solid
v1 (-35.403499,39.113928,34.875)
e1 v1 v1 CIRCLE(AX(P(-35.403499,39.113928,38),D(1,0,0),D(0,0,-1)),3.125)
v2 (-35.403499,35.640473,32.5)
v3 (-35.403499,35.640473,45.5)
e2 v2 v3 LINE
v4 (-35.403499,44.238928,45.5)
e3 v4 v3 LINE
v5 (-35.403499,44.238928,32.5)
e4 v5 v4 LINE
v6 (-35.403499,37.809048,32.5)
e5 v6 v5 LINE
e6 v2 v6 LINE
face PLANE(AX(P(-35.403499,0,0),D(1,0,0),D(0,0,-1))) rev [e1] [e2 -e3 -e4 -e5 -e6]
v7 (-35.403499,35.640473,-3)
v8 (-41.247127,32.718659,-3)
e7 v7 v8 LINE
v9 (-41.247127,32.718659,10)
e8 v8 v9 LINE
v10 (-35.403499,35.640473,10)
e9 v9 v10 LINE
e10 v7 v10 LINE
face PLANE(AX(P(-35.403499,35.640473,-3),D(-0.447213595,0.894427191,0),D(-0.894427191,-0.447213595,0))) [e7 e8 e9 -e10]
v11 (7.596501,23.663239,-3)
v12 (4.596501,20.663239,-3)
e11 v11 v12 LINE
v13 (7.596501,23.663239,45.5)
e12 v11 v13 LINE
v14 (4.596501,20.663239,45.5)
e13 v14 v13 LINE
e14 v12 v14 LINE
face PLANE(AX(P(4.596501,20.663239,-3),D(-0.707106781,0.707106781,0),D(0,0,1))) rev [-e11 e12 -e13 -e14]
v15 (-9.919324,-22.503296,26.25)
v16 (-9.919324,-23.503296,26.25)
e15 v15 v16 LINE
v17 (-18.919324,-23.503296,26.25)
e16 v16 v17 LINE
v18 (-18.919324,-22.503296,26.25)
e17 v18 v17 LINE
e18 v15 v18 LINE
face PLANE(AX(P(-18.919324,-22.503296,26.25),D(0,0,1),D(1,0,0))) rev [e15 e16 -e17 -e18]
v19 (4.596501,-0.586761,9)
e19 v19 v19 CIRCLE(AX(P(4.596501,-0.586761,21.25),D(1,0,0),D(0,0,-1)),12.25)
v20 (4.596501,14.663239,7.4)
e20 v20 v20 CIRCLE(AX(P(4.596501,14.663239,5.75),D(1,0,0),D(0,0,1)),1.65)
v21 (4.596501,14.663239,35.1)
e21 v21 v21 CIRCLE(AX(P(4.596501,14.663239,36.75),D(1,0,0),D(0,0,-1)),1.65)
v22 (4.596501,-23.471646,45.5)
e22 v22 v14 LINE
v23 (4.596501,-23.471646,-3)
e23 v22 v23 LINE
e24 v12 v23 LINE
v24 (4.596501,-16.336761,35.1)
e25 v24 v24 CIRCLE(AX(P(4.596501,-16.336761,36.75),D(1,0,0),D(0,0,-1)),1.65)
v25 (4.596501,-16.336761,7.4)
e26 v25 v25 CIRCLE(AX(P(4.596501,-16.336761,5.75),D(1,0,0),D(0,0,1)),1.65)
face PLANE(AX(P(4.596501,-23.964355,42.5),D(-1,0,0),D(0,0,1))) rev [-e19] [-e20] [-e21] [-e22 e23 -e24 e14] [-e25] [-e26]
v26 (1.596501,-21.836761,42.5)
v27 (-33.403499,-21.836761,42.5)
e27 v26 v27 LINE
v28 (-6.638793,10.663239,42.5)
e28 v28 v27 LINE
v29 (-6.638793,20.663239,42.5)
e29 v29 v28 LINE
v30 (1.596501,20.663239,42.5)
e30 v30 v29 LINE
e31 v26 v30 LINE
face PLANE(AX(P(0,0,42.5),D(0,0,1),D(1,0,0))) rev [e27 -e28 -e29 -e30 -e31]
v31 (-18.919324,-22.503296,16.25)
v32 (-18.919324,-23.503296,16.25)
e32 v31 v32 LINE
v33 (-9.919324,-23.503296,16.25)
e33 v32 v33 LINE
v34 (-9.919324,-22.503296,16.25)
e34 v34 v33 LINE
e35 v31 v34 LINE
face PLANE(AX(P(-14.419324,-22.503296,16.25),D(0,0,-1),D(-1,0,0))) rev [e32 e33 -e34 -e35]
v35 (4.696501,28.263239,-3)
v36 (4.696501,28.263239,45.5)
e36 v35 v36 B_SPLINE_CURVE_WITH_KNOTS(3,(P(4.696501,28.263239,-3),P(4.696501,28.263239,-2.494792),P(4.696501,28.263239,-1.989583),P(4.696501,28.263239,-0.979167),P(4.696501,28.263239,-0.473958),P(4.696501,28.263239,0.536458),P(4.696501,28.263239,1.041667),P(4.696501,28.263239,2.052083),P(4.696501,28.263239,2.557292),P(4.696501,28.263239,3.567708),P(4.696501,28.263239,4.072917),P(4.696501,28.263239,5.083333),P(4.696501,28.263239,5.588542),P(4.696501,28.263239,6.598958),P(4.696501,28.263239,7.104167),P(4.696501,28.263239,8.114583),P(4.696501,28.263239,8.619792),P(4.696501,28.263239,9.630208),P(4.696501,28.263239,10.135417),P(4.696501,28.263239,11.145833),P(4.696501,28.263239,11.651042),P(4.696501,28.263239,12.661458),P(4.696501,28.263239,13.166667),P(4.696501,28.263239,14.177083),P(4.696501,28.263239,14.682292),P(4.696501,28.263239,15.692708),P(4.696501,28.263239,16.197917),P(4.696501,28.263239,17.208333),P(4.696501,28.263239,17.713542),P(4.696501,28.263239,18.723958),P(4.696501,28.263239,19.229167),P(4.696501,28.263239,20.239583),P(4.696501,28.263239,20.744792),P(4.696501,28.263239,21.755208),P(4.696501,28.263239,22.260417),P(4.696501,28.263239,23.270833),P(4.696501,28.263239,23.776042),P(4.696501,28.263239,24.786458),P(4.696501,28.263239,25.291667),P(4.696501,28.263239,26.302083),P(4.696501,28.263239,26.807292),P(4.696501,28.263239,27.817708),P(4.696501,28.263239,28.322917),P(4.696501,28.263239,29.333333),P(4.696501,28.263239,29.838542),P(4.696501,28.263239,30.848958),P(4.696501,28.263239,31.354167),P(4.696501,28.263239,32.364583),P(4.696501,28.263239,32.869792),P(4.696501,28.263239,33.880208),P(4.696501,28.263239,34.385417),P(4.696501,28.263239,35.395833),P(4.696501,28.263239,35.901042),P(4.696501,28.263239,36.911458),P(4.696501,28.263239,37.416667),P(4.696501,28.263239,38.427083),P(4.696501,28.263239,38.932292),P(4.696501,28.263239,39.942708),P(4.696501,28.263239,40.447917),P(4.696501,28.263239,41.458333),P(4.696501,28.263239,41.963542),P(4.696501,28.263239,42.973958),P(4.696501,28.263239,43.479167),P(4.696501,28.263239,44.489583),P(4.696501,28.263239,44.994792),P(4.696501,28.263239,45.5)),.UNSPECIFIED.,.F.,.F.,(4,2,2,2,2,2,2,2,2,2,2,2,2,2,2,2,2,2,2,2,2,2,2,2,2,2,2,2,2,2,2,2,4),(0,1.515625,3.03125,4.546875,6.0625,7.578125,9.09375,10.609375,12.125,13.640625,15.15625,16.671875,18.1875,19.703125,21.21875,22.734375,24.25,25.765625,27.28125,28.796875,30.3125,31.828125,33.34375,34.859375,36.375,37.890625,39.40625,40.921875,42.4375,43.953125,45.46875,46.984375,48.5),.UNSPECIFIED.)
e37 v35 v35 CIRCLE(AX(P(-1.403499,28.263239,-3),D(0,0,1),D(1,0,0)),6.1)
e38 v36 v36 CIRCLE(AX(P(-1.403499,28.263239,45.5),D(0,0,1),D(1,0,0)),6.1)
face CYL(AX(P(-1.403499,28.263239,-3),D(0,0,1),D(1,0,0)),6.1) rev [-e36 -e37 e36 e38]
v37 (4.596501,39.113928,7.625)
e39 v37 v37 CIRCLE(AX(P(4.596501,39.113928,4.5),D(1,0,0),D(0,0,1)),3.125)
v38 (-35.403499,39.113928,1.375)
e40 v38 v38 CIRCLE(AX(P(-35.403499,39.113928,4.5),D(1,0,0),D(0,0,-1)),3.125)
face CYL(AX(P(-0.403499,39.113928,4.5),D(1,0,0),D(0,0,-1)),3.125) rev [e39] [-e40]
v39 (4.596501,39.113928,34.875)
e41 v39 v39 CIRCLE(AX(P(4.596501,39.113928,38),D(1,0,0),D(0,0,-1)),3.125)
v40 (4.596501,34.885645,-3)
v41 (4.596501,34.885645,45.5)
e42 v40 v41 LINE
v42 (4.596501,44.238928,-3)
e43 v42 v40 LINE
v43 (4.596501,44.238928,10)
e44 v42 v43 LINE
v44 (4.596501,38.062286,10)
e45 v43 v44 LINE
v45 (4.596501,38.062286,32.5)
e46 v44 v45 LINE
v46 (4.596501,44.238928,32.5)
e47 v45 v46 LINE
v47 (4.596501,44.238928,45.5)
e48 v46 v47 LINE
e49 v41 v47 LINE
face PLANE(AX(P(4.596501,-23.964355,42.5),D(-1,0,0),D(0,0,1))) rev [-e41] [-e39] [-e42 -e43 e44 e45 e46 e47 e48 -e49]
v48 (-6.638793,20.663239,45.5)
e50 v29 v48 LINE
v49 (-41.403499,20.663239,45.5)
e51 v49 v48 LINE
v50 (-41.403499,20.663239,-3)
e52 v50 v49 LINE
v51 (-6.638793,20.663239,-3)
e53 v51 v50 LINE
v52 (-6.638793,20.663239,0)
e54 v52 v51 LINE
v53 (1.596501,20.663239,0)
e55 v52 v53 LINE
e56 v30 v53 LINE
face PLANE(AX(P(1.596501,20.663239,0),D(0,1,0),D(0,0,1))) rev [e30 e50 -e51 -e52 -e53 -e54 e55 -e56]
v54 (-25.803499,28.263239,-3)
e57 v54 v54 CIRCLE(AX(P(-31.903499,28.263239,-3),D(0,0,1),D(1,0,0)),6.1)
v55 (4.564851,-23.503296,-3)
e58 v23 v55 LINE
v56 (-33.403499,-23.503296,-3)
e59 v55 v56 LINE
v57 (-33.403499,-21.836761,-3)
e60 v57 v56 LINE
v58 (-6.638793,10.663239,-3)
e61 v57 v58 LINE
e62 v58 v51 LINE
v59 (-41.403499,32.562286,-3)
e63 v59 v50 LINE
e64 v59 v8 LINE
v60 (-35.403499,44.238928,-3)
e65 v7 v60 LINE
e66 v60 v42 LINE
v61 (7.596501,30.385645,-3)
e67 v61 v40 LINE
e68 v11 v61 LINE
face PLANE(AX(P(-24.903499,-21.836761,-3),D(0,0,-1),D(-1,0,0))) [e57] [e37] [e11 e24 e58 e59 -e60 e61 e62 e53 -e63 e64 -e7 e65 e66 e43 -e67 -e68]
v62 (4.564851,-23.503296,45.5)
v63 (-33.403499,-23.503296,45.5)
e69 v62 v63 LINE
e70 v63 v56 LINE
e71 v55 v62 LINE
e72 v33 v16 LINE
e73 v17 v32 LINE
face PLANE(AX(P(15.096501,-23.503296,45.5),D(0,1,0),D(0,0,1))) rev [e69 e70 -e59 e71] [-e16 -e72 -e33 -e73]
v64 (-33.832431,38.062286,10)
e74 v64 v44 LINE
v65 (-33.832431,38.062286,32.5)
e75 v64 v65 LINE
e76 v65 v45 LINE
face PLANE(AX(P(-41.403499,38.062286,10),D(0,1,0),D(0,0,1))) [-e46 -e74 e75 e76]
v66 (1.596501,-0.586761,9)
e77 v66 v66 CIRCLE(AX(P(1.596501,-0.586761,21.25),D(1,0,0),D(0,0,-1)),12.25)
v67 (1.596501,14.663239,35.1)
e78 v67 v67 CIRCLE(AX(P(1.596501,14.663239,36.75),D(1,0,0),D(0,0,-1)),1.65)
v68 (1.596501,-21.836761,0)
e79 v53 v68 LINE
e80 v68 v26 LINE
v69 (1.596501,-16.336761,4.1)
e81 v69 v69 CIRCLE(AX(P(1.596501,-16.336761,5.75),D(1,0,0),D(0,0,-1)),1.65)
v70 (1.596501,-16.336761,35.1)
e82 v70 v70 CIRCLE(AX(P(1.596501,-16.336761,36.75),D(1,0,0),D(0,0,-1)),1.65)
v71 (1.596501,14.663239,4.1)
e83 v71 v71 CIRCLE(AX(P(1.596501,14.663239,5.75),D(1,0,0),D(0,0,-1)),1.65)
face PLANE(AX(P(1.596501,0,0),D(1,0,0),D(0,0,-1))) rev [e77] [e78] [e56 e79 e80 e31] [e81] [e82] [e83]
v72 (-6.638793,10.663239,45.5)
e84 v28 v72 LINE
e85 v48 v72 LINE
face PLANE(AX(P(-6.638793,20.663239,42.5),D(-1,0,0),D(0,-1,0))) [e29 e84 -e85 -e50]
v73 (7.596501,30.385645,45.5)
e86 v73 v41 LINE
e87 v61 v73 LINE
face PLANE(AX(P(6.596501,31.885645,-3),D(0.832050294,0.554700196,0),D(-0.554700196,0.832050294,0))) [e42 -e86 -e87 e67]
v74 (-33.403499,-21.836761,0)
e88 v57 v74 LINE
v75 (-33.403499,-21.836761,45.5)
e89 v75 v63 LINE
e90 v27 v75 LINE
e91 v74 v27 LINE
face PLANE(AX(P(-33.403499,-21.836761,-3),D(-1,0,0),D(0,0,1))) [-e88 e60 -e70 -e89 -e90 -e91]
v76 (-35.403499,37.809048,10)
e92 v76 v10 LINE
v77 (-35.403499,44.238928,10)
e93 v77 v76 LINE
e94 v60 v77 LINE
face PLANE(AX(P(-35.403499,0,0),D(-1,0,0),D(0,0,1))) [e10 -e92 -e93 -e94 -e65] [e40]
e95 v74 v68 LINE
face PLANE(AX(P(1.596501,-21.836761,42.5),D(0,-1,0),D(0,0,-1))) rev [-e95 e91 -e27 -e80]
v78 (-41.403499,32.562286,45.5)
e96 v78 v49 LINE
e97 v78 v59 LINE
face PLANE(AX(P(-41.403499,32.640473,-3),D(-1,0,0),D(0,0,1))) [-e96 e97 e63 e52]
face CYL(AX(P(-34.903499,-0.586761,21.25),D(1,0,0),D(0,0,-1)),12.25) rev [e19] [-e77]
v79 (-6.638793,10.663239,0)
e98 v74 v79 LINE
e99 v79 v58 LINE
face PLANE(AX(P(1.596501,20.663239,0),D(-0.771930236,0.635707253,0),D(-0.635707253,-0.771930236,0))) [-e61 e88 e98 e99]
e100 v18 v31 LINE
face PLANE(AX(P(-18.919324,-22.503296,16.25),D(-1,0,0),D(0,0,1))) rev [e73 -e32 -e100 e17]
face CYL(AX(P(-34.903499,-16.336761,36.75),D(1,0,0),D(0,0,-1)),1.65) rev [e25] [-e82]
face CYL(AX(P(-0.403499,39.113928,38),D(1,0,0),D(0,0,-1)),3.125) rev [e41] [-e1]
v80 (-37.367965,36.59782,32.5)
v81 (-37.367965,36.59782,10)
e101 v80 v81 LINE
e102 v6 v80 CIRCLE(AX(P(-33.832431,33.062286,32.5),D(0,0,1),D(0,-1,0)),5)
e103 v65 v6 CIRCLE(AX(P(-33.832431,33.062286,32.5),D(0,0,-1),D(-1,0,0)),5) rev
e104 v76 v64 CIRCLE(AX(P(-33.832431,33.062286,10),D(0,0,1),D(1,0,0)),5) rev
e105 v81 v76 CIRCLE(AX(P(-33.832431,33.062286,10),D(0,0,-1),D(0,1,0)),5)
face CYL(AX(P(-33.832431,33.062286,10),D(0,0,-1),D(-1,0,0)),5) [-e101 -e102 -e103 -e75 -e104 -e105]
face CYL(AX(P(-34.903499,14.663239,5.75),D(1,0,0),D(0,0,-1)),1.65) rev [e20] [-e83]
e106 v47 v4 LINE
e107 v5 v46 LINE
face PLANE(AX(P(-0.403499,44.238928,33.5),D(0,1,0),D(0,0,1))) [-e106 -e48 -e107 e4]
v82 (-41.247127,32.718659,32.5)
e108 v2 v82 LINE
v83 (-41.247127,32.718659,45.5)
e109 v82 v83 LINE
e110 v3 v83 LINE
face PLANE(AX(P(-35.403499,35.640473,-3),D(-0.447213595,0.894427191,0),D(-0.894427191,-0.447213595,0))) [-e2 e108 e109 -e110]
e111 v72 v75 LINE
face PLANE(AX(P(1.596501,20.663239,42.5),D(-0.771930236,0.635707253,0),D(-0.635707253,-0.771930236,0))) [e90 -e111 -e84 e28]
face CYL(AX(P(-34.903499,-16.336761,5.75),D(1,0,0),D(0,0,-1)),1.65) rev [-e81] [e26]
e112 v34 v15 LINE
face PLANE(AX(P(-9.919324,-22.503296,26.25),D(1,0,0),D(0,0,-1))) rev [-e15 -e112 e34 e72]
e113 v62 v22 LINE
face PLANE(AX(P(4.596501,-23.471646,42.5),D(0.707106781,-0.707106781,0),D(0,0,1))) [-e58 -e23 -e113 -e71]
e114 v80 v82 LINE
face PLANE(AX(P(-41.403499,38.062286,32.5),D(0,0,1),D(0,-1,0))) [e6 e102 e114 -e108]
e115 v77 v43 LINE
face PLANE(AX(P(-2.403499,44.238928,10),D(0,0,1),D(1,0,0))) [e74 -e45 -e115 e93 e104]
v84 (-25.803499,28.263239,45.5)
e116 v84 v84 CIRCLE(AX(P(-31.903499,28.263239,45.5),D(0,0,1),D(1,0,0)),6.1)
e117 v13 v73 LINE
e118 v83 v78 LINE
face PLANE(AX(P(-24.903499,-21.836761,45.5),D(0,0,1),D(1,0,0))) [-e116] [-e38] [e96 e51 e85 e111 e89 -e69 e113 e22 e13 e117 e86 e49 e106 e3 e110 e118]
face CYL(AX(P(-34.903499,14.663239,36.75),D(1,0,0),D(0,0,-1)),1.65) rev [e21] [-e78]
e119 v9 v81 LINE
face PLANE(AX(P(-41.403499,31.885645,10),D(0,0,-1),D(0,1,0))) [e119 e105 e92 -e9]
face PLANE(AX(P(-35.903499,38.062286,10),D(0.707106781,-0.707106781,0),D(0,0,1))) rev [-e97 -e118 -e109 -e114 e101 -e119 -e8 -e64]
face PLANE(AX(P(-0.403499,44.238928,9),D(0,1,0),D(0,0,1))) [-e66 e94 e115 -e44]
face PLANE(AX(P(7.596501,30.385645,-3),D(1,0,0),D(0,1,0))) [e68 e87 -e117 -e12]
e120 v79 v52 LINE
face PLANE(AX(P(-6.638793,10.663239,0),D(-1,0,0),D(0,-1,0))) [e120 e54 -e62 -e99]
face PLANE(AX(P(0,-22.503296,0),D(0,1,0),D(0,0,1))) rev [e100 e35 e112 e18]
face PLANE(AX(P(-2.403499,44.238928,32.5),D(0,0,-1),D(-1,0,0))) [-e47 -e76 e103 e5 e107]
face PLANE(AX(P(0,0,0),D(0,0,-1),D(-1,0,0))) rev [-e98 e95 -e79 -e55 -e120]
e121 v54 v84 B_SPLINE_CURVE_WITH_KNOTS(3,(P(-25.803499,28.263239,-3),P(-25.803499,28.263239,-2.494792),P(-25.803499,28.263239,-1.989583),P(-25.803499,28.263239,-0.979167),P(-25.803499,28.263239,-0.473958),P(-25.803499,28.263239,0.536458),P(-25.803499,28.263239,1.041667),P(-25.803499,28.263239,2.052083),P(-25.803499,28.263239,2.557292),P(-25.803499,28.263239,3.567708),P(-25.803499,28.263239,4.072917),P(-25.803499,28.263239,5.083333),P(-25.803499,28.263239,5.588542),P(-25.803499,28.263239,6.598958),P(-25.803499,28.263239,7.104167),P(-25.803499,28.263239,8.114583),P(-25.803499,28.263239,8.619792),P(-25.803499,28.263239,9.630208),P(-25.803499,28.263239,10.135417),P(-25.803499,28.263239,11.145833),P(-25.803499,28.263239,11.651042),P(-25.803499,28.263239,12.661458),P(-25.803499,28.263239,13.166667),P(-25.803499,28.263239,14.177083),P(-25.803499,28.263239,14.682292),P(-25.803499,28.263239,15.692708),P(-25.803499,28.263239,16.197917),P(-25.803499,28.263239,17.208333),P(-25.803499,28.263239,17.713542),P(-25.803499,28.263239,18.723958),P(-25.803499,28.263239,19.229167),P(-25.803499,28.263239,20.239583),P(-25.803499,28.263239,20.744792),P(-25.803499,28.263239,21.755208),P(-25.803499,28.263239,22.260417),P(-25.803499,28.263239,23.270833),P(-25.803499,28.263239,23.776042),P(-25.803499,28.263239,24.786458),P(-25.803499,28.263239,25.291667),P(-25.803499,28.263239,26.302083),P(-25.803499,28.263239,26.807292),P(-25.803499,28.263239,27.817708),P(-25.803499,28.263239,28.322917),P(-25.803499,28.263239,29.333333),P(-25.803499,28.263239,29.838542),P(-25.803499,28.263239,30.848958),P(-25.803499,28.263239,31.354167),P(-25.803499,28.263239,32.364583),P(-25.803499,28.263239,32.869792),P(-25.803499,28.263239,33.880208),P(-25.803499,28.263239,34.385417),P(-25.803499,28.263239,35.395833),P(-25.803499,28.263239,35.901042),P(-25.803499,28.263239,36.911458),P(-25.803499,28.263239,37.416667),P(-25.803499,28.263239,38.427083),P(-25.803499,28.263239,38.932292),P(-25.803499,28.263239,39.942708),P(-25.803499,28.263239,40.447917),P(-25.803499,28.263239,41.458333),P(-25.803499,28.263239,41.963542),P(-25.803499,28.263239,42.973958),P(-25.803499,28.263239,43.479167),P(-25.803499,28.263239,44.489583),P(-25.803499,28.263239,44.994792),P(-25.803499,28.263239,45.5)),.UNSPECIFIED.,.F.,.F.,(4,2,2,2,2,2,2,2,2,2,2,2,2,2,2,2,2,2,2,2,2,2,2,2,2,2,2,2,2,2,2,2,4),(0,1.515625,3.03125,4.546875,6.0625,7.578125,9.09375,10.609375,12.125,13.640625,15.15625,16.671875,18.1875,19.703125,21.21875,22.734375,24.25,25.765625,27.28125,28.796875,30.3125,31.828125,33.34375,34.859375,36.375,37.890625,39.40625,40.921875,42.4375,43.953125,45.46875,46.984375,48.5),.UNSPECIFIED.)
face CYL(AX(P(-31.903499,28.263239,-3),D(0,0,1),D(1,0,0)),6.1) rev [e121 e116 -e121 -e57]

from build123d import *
from build123d.topology import SkipClean

# Parameters (mm, degrees)
SKETCH1_W            = 42.5
SKETCH1_H            = 55.85
BOSS_EXTRUDE2_DEPTH  = 42.5
SKETCH5_R            = 3.175
CUT_EXTRUDE2_DEPTH   = 42.5
SKETCH6_W            = 42.5
SKETCH6_H            = 42.5
CUT_EXTRUDE3_DEPTH   = 39.5
SKETCH7_R            = 12.25
SKETCH7_R_2          = 1.65
CUT_EXTRUDE4_DEPTH   = 39.5
SKETCH9_W            = 10
SKETCH9_H            = 42.5
CUT_EXTRUDE5_DEPTH   = 39.5
CHAMFER1_SIZE        = 3
CHAMFER2_SIZE        = 2
SKETCH10_W           = 3
SKETCH10_H           = 2.12759362
BOSS_EXTRUDE3_DEPTH  = 3
SKETCH12_W           = 3
SKETCH12_H           = 3
BOSS_EXTRUDE4_DEPTH  = 3
BOSS_EXTRUDE5_DEPTH  = 2
BOSS_EXTRUDE6_DEPTH  = 2
SKETCH16_W           = 9
SKETCH16_H           = 14.17
SKETCH16_R           = 3.125
BOSS_EXTRUDE8_DEPTH  = 5
SKETCH18_W           = 9
SKETCH18_H           = 12.353282928
BOSS_EXTRUDE9_DEPTH  = 2
SKETCH20_W           = 0.494527866
SKETCH20_H           = 3.5
BOSS_EXTRUDE10_DEPTH = 0.2
BOSS_EXTRUDE11_DEPTH = 42.5
BOSS_EXTRUDE12_DEPTH = 48.5
CUT_EXTRUDE8_DEPTH   = 54.5
BOSS_EXTRUDE15_DEPTH = 3
BOSS_EXTRUDE16_DEPTH = 3
BOSS_EXTRUDE17_DEPTH = 1
BOSS_EXTRUDE19_DEPTH = 3
BOSS_EXTRUDE20_DEPTH = 1
BOSS_EXTRUDE21_START = -3
SKETCH34_R           = 3.175
BOSS_EXTRUDE21_DEPTH = 3
SKETCH35_R           = 3.175
BOSS_EXTRUDE22_DEPTH = 3
BOSS_EXTRUDE23_DEPTH = 3
BOSS_EXTRUDE24_DEPTH = 3
CUT_EXTRUDE10_DEPTH  = 1
SKETCH41_W           = 48.5
SKETCH41_H           = 4.770205393
BOSS_EXTRUDE25_DEPTH = 1.3
CHAMFER3_SIZE        = 1.5
SKETCH44_W           = 1
SKETCH44_H           = 12.353282928
BOSS_EXTRUDE26_DEPTH = 7
SKETCH45_W           = 13
SKETCH45_H           = 8.5
SKETCH45_R           = 3.125
SKETCH45_H_2         = 13.67
BOSS_EXTRUDE27_DEPTH = 40
SKETCH46_R           = 3.125
CUT_EXTRUDE11_DEPTH  = 49
CUT_EXTRUDE12_DEPTH  = 68
CUT_EXTRUDE13_DEPTH  = 68
SKETCH49_W           = 2.643980288
SKETCH49_H           = 1.166461892
CUT_EXTRUDE14_DEPTH  = 68
BOSS_EXTRUDE28_DEPTH = 13
BOSS_EXTRUDE29_DEPTH = 48.5
SKETCH53_W           = 2
SKETCH53_H           = 11.22240638
BOSS_EXTRUDE30_DEPTH = 48.5
CHAMFER4_SIZE        = 2
SKETCH57_W           = 22.5
SKETCH57_H           = 6.176641464
BOSS_EXTRUDE32_DEPTH = 46
BOSS_EXTRUDE33_DEPTH = 48.5
BOSS_EXTRUDE35_DEPTH = 48.5
SKETCH55_R           = 6.1
CUT_EXTRUDE15_DEPTH  = 48.5
BOSS_EXTRUDE36_DEPTH = 48.5
SKETCH62_W           = 48.5
SKETCH62_H           = 0.4
CUT_EXTRUDE16_DEPTH  = 48.5
CHAMFER5_SIZE        = 5.5
FILLET1_R            = 5
CUT_EXTRUDE17_DEPTH  = 1
BOSS_EXTRUDE37_DEPTH = 48.5


# Some blends are built 0.0001 mm under size
with BuildPart() as part:
    # Sketch1 → Boss-Extrude2 (new body)
    with BuildSketch(Plane.XY):
        with Locations((-16.653499003, 3.960644895)):
            Rectangle(SKETCH1_W, SKETCH1_H)
    extrude(amount=BOSS_EXTRUDE2_DEPTH)

    # Sketch5 → Cut-Extrude2 (cut)
    with BuildSketch(Plane.XY.offset(42.5)):
        with Locations((-31.903499003, 25.965832134)):
            Circle(SKETCH5_R)
        with Locations(Location((-1.403499003, 25.965832134, 0), (0, 0, 180))):
            Circle(SKETCH5_R)
    extrude(amount=-CUT_EXTRUDE2_DEPTH, mode=Mode.SUBTRACT)

    # Sketch6 → Cut-Extrude3 (cut)
    with BuildSketch(Plane.ZY.offset(37.903499003)):
        with Locations((21.25, -0.586761485)):
            Rectangle(SKETCH6_W, SKETCH6_H)
    extrude(amount=-CUT_EXTRUDE3_DEPTH, mode=Mode.SUBTRACT)

    # Sketch7 → Cut-Extrude4 (cut)
    with BuildSketch(Plane(origin=(4.596500997, 0, 0), x_dir=(0, 0, -1), z_dir=(1, 0, 0))):
        with Locations((-21.25, -0.586761485)):
            Circle(SKETCH7_R)
        with Locations((-36.75, -16.336761485)):
            Circle(SKETCH7_R_2)
        with Locations((-5.75, -16.336761485)):
            Circle(SKETCH7_R_2)
        with Locations((-36.75, 14.663238515)):
            Circle(SKETCH7_R_2)
        with Locations((-5.75, 14.663238515)):
            Circle(SKETCH7_R_2)
    extrude(amount=-CUT_EXTRUDE4_DEPTH, mode=Mode.SUBTRACT)

    # Sketch9 → Cut-Extrude5 (cut)
    with BuildSketch(Plane.XZ.offset(23.964355105)):
        with Locations((-32.903499003, 21.25)):
            Rectangle(SKETCH9_W, SKETCH9_H)
    extrude(amount=-CUT_EXTRUDE5_DEPTH, mode=Mode.SUBTRACT)

    # Chamfer1
    chamfer1_edges = [part.edges().sort_by_distance(p)[0] for p in [
        (-37.903499003, 20.663238515, 21.25),
        (-37.903499003, 31.885644895, 21.25),
    ]]
    chamfer(chamfer1_edges, length=CHAMFER1_SIZE)

    # Chamfer2
    chamfer2_edges = [part.edges().sort_by_distance(p)[0] for p in [
        (4.596500997, -23.964355105, 21.25),
    ]]
    chamfer(chamfer2_edges, length=CHAMFER2_SIZE)

    # Sketch10 → Boss-Extrude3 (add)
    with BuildSketch(Plane.ZY.offset(27.903499003)):
        with Locations((44, -22.900558295)):
            Rectangle(SKETCH10_W, SKETCH10_H)
        with Locations((-1.5, -22.900558295)):
            Rectangle(SKETCH10_W, SKETCH10_H)
    extrude(amount=-BOSS_EXTRUDE3_DEPTH)

    # Sketch12 → Boss-Extrude4 (add)
    with BuildSketch(Plane.ZY.offset(-1.596500997)):
        with Locations((44, 19.163238515)):
            Rectangle(SKETCH12_W, SKETCH12_H)
        with Locations((-1.5, 19.163238515)):
            Rectangle(SKETCH12_W, SKETCH12_H)
    extrude(amount=-BOSS_EXTRUDE4_DEPTH)

    # Sketch13 → Boss-Extrude5 (add)
    with BuildSketch(Plane(origin=(0, 0, -3), x_dir=(-1, 0, 0), z_dir=(0, 0, -1))):
        Polygon((-1.596500997, 17.663238515), (24.903499003, -21.836761485), (27.903499003, -21.836761485), (-1.596500997, 20.663238515), align=None)
    extrude(amount=-BOSS_EXTRUDE5_DEPTH)

    # Sketch14 → Boss-Extrude6 (add)
    with BuildSketch(Plane.XY.offset(45.5)):
        Polygon((1.596500997, 17.663238515), (-24.903499003, -21.836761485), (-27.903499003, -21.836761485), (1.596500997, 20.663238515), align=None)
    extrude(amount=-BOSS_EXTRUDE6_DEPTH)

    # Sketch16 → Boss-Extrude8 (add)
    # profile 1 of 2: a face of its own
    with BuildSketch(Plane(origin=(4.596500997, 0, 0), x_dir=(0, 0, -1), z_dir=(1, 0, 0))):
        with Locations((-38, 37.153927823)):
            Rectangle(SKETCH16_W, SKETCH16_H)
        with Locations((-38, 39.113927823)):
            Circle(SKETCH16_R, mode=Mode.SUBTRACT)
    # profile 2 of 2: a face of its own
    with BuildSketch(Plane(origin=(4.596500997, 0, 0), x_dir=(0, 0, -1), z_dir=(1, 0, 0))):
        with Locations((-4.5, 37.153927823)):
            Rectangle(SKETCH16_W, SKETCH16_H)
        with Locations(Location((-4.5, 39.113927823, 0), (0, 0, 180))):
            Circle(SKETCH16_R, mode=Mode.SUBTRACT)
    extrude(amount=-BOSS_EXTRUDE8_DEPTH)

    # Sketch18 → Boss-Extrude9 (add)
    with BuildSketch(Plane.ZY.offset(0.403499003)):
        with Locations((4.5, 38.062286359)):
            Rectangle(SKETCH18_W, SKETCH18_H)
        with Locations((38, 38.062286359)):
            Rectangle(SKETCH18_W, SKETCH18_H)
    extrude(amount=BOSS_EXTRUDE9_DEPTH)

    # Sketch20 → Boss-Extrude10 (add)
    with BuildSketch(Plane.XZ.offset(23.964355105)):
        with Locations((-12.40623507, 23)):
            Rectangle(SKETCH20_W, SKETCH20_H)
    extrude(amount=BOSS_EXTRUDE10_DEPTH)

    # Sketch22 → Boss-Extrude11 (add)
    with BuildSketch(Plane.XY.offset(42.5)):
        Polygon((-27.903499003, -23.964355105), (-27.903499003, -24.964355105), (4.596500997, -24.964355105), (4.596500997, -21.964355105), (2.596500997, -23.964355105), align=None)
    extrude(amount=-BOSS_EXTRUDE11_DEPTH)

    # Sketch23 → Boss-Extrude12 (add)
    with BuildSketch(Plane.XY.offset(45.5)):
        Polygon((1.596500997, -21.836761485), (-33.403499003, -21.836761485), (-33.403499003, -24.836761485), (1.596500997, -24.964355105), align=None)
    extrude(amount=-BOSS_EXTRUDE12_DEPTH)

    # Sketch24 → Cut-Extrude8 (cut)
    with BuildSketch(Plane.XY.offset(45.5)):
        Polygon((-27.903499003, -24.856811911), (-27.903499003, -24.964355105), (1.596500997, -24.964355105), align=None)
    extrude(amount=-CUT_EXTRUDE8_DEPTH, mode=Mode.SUBTRACT)

    # Sketch28 → Boss-Extrude15 (add)
    with BuildSketch(Plane(origin=(-0.090985928, -24.958203317, 0), x_dir=(0.9999933551145118, -0.0036455077591437566, 0), z_dir=(-0.0036455077591437566, -0.9999933551145118, 0))):
        Polygon((-33.312734433, 45.5), (-33.312734433, -3), (1.687498139, -3), (4.687478204, -3), (4.687478204, 0), (4.687478204, 42.5), (4.687478204, 45.5), (1.532098916, 45.5), align=None)
    extrude(amount=-BOSS_EXTRUDE15_DEPTH)

    # Sketch30 → Boss-Extrude16 (add)
    with BuildSketch(Plane.XY.offset(45.5)):
        Polygon((4.596500997, 20.663238515), (1.596500997, 20.663238515), (-33.403499003, -21.836761485), (-33.403499003, -24.836761485), (4.596461128, -24.975291555), align=None)
    extrude(amount=-BOSS_EXTRUDE16_DEPTH)

    # Sketch31 → Boss-Extrude17 (add)
    with BuildSketch(Plane(origin=(4.596500997, 0, 0), x_dir=(0, 0, -1), z_dir=(1, 0, 0))):
        Polygon((-45.5, 20.663238515), (-40.56451316, 20.663238515), (-40.56451316, -21.975271766), (-45.5, -21.836761485), align=None)
    extrude(amount=-BOSS_EXTRUDE17_DEPTH)

    # Sketch32 → Boss-Extrude19 (add)
    with BuildSketch(Plane(origin=(0, 0, -3), x_dir=(-1, 0, 0), z_dir=(0, 0, -1))):
        Polygon((-4.596500997, 20.663238515), (-4.596461128, -24.975291555), (33.403499003, -24.836761485), (33.403499003, -21.836761485), (-1.596500997, 20.663238515), align=None)
    extrude(amount=-BOSS_EXTRUDE19_DEPTH)

    # Sketch33 → Boss-Extrude20 (add)
    with BuildSketch(Plane(origin=(4.596500997, 0, 0), x_dir=(0, 0, -1), z_dir=(1, 0, 0))):
        Polygon((3, 20.663238515), (-2.503573256, 20.663238515), (-2.503573256, -21.97531149), (3, -21.97527163), align=None)
    extrude(amount=-BOSS_EXTRUDE20_DEPTH)

    # Sketch34 → Boss-Extrude21 (add)
    with BuildSketch(Plane(origin=(0, 0, -3), x_dir=(-1, 0, 0), z_dir=(0, 0, -1)).offset(BOSS_EXTRUDE21_START)):
        Polygon((-4.596500997, 20.663238515), (34.903499003, 20.663238515), (37.903499003, 23.663238515), (37.903499003, 28.885644895), (34.903499003, 31.885644895), (2.403499003, 31.885644895), (2.403499003, 44.238927823), (-4.596500997, 44.238927823), align=None)
        with Locations((1.403499003, 25.965832134)):
            Circle(SKETCH34_R, mode=Mode.SUBTRACT)
        with Locations(Location((31.903499003, 25.965832134, 0), (0, 0, 180))):
            Circle(SKETCH34_R, mode=Mode.SUBTRACT)
    extrude(amount=BOSS_EXTRUDE21_DEPTH)

    # Sketch35 → Boss-Extrude22 (add)
    with BuildSketch(Plane.XY.offset(45.5)):
        Polygon((4.596500997, 20.663238515), (4.596500997, 44.238927823), (-2.403499003, 44.238927823), (-2.403499003, 31.885644895), (-34.903499003, 31.885644895), (-37.903499003, 28.885644895), (-37.903499003, 23.663238515), (-34.903499003, 20.663238515), align=None)
        with Locations((-31.903499003, 25.965832134)):
            Circle(SKETCH35_R, mode=Mode.SUBTRACT)
        with Locations((-1.403499003, 25.965832134)):
            Circle(SKETCH35_R, mode=Mode.SUBTRACT)
    extrude(amount=-BOSS_EXTRUDE22_DEPTH)

    # Sketch36 → Boss-Extrude23 (add)
    with BuildSketch(Plane(origin=(0, 0, -3), x_dir=(-1, 0, 0), z_dir=(0, 0, -1))):
        Polygon((-1.596500997, 20.663238515), (6.63879312, 10.663238515), (6.63879312, 20.663238515), align=None)
    extrude(amount=-BOSS_EXTRUDE23_DEPTH)

    # Sketch37 → Boss-Extrude24 (add)
    with BuildSketch(Plane.XY.offset(45.5)):
        Polygon((-6.63879312, 20.663238515), (-6.63879312, 10.663238515), (1.596500997, 20.663238515), align=None)
    extrude(amount=-BOSS_EXTRUDE24_DEPTH)

    # Sketch40 → Cut-Extrude10 (cut)
    with BuildSketch(Plane(origin=(4.687447057, -0.017088238, 0), x_dir=(0, 0, -1), z_dir=(0.9999933551145119, -0.003645507759143759, 0))):
        Polygon((-45.5, -21.819859802), (-45.5, -24.958369162), (3, -24.958369162), (3, -21.958369162), align=None)
    extrude(amount=-CUT_EXTRUDE10_DEPTH, mode=Mode.SUBTRACT)

    # Sketch41 → Boss-Extrude25 (add)
    with BuildSketch(Plane(origin=(4.596500997, 0, 0), x_dir=(0, 0, -1), z_dir=(1, 0, 0))):
        with Locations((-21.25, -22.586543351)):
            Rectangle(SKETCH41_W, SKETCH41_H)
    extrude(amount=-BOSS_EXTRUDE25_DEPTH)

    # Chamfer3
    # the kernel refuses this chamfer: 1.5 mm, written as the material it takes off along each edge
    with BuildSketch(Plane(origin=(4.596500997, -24.971646047, 49.357524482), x_dir=(0.02749587661058619, 0.9996219169112968, 0), z_dir=(0, 0, -1))) as chamfer3_piece_1:
        Polygon((CHAMFER3_SIZE * 0.999621916911, -CHAMFER3_SIZE * 0.0274958766106), (-CHAMFER3_SIZE * 0.0274958766106, -CHAMFER3_SIZE * 0.999621916911), (0, 0), align=None)
    extrude(amount=56.215048964, mode=Mode.SUBTRACT)

    # Sketch44 → Boss-Extrude26 (add)
    with BuildSketch(Plane(origin=(4.596500997, 0, 0), x_dir=(0, 0, -1), z_dir=(1, 0, 0))):
        with Locations((-33, 38.062286359)):
            Rectangle(SKETCH44_W, SKETCH44_H)
        with Locations((-9.5, 38.062286359)):
            Rectangle(SKETCH44_W, SKETCH44_H)
    extrude(amount=-BOSS_EXTRUDE26_DEPTH)

    # Sketch45 → Boss-Extrude27 (add)
    # profile 1 of 2: a face of its own
    with BuildSketch(Plane(origin=(4.596500997, 0, 0), x_dir=(0, 0, -1), z_dir=(1, 0, 0))):
        with Locations((-39, 39.988927823)):
            Rectangle(SKETCH45_W, SKETCH45_H)
        with Locations((-38, 39.113927823)):
            Circle(SKETCH45_R, mode=Mode.SUBTRACT)
    # profile 2 of 2: a face of its own
    with BuildSketch(Plane(origin=(4.596500997, 0, 0), x_dir=(0, 0, -1), z_dir=(1, 0, 0))):
        with Locations((-3.5, 37.403927823)):
            Rectangle(SKETCH45_W, SKETCH45_H_2)
        with Locations(Location((-4.5, 39.113927823, 0), (0, 0, 180))):
            Circle(SKETCH45_R, mode=Mode.SUBTRACT)
    extrude(amount=-BOSS_EXTRUDE27_DEPTH)

    # Sketch46 → Cut-Extrude11 (cut)
    with BuildSketch(Plane(origin=(4.596500997, 0, 0), x_dir=(0, 0, -1), z_dir=(1, 0, 0))):
        with Locations((-38, 39.113927823)):
            Circle(SKETCH46_R)
        with Locations((-4.5, 39.113927823)):
            Circle(SKETCH46_R)
    extrude(amount=-CUT_EXTRUDE11_DEPTH, mode=Mode.SUBTRACT)

    # Sketch47 → Cut-Extrude12 (cut)
    with BuildSketch(Plane.ZY.offset(33.403499003)):
        Polygon((-3, -24.903295754), (-3, -23.903295754), (45.5, -23.903295754), (45.5, -24.836761485), align=None)
    extrude(amount=-CUT_EXTRUDE12_DEPTH, mode=Mode.SUBTRACT)


with BuildPart() as cut_extrude12_piece_1:
    # of the separate pieces the step leaves, piece 1, a body of its own (cut_extrude12_pieces)
    add(part.part.solids().sort_by_distance((4.596500997, 44.238927823, 32.5))[0])

    # Sketch51 → Boss-Extrude28 (add)
    with BuildSketch(Plane.XY.offset(45.5)):
        Polygon((-35.403499003, 35.738927823), (-35.403499003, 31.385644895), (-34.903499003, 31.885644895), (-2.403499003, 31.885644895), (-2.403499003, 35.738927823), align=None)
    extrude(amount=-BOSS_EXTRUDE28_DEPTH)

    # Sketch52 → Boss-Extrude29 (add)
    with BuildSketch(Plane.XY.offset(45.5)):
        Polygon((-41.403499003, 20.663238515), (-34.903499003, 20.663238515), (-37.903499003, 23.663238515), (-37.903499003, 28.885644895), (-35.403499003, 31.385644895), (-35.403499003, 32.640472598), (-41.403499003, 32.640472598), align=None)
    extrude(amount=-BOSS_EXTRUDE29_DEPTH)

    # Sketch53 → Boss-Extrude30 (add)
    with BuildSketch(Plane.XY.offset(45.5)):
        with Locations((5.596500997, 26.274441705)):
            Rectangle(SKETCH53_W, SKETCH53_H)
    extrude(amount=-BOSS_EXTRUDE30_DEPTH)

    # Chamfer4
    chamfer4_edges = [cut_extrude12_piece_1.edges().sort_by_distance(p)[0] for p in [
        (6.596500997, 20.663238515, 21.25),
        (6.596500997, 31.885644895, 21.25),
    ]]
    chamfer(chamfer4_edges, length=CHAMFER4_SIZE - 0.0001)  # a hair under: the kernel refuses the full size

    # Sketch57 → Boss-Extrude32 (add)
    with BuildSketch(Plane(origin=(4.596500997, 0, 0), x_dir=(0, 0, -1), z_dir=(1, 0, 0))):
        with Locations((-21.25, 34.973965627)):
            Rectangle(SKETCH57_W, SKETCH57_H)
    extrude(amount=-BOSS_EXTRUDE32_DEPTH)

    # Sketch58 → Boss-Extrude33 (add)
    with BuildSketch(Plane.XY.offset(45.5)):
        Polygon((4.596500997, 31.885644895), (6.596500997, 29.885644895), (6.596500997, 31.885644895), align=None)
    extrude(amount=-BOSS_EXTRUDE33_DEPTH)

    # Sketch60 → Boss-Extrude35 (add)
    with BuildSketch(Plane.XY.offset(45.5)):
        Polygon((-35.403499003, 35.640472598), (-41.403499003, 32.640472598), (-35.403499003, 32.640472598), align=None)
    extrude(amount=-BOSS_EXTRUDE35_DEPTH)

    # Sketch55 → Cut-Extrude15 (cut)
    with BuildSketch(Plane.XY.offset(45.5)):
        with Locations((-31.903499003, 28.263238515)):
            Circle(SKETCH55_R)
        with Locations((-1.403499003, 28.263238515)):
            Circle(SKETCH55_R)
    extrude(amount=-CUT_EXTRUDE15_DEPTH, mode=Mode.SUBTRACT)

    # Sketch61 → Boss-Extrude36 (add)
    with BuildSketch(Plane.XY.offset(45.5)):
        Polygon((4.596500997, 31.885644895), (6.596500997, 31.885644895), (4.596500997, 34.885644895), align=None)
    extrude(amount=-BOSS_EXTRUDE36_DEPTH)

    # Sketch62 → Cut-Extrude16 (cut)
    with BuildSketch(Plane.ZY.offset(33.403499003)):
        with Locations((21.25, -23.703295754)):
            Rectangle(SKETCH62_W, SKETCH62_H)
    extrude(amount=-CUT_EXTRUDE16_DEPTH, mode=Mode.SUBTRACT)

    # Chamfer5
    chamfer5_edges = [cut_extrude12_piece_1.edges().sort_by_distance(p)[0] for p in [
        (-41.403499003, 38.062286359, 21.25),
    ]]
    chamfer(chamfer5_edges, length=CHAMFER5_SIZE)

    # Fillet1
    # the kernel refuses this fillet: 5 mm, written as the material it takes off along each edge
    with BuildSketch(Plane(origin=(-35.903499003, 38.062286359, 10), x_dir=(-0.7071067811865476, -0.7071067811865476, 0), z_dir=(0, 0, 1))) as fillet1_piece_1:
        with BuildLine():
            CenterArc((FILLET1_R * 0.414213562373, FILLET1_R), FILLET1_R, 225, 45)
            Line((-FILLET1_R * 0.292893218813, FILLET1_R * 0.292893218813), (0, 0))
            Line((0, 0), (FILLET1_R * 0.414213562373, 0))
        make_face()
    extrude(amount=22.5, mode=Mode.SUBTRACT)

    # Sketch65 → Cut-Extrude17 (cut)
    with BuildSketch(Plane.XZ.offset(23.503295754)):
        Polygon((-14.419323856, 16.25), (-18.919323856, 16.25), (-18.919323856, 26.25), (-9.919323856, 26.25), (-9.919323856, 16.25), align=None)
    extrude(amount=-CUT_EXTRUDE17_DEPTH, mode=Mode.SUBTRACT)

    # Sketch67 → Boss-Extrude37 (add)
    with SkipClean():  # the faces are left unmerged after this step: merging them gives an invalid solid
        with BuildSketch(Plane.XY.offset(45.5)):
            Polygon((6.596500997, 31.885644895), (7.596500997, 30.385644895), (7.596500997, 23.663238515), (6.596500997, 22.663238515), align=None)
        extrude(amount=-BOSS_EXTRUDE37_DEPTH)


with BuildPart() as cut_extrude12_piece_2:
    # of the separate pieces the step leaves, piece 2, a body of its own (cut_extrude12_pieces)
    add(part.part.solids().sort_by_distance((3.23138556, -24.836761485, 45.5))[0])

    # Sketch48 → Cut-Extrude13 (cut)
    with BuildSketch(Plane.ZY.offset(33.403499003)):
        Polygon((-2.929774612, -24.185457139), (-2.929774612, -25.519392631), (45.758870815, -25.786179729), (45.758870815, -24.185457139), align=None)
    extrude(amount=-CUT_EXTRUDE13_DEPTH, mode=Mode.SUBTRACT)

    # Sketch49 → Cut-Extrude14 (cut)
    with BuildSketch(Plane.ZY.offset(33.403499003)):
        with Locations((-2.157001957, -24.67821455)):
            Rectangle(SKETCH49_W, SKETCH49_H)
    extrude(amount=-CUT_EXTRUDE14_DEPTH, mode=Mode.SUBTRACT)


solid = cut_extrude12_piece_1.part
